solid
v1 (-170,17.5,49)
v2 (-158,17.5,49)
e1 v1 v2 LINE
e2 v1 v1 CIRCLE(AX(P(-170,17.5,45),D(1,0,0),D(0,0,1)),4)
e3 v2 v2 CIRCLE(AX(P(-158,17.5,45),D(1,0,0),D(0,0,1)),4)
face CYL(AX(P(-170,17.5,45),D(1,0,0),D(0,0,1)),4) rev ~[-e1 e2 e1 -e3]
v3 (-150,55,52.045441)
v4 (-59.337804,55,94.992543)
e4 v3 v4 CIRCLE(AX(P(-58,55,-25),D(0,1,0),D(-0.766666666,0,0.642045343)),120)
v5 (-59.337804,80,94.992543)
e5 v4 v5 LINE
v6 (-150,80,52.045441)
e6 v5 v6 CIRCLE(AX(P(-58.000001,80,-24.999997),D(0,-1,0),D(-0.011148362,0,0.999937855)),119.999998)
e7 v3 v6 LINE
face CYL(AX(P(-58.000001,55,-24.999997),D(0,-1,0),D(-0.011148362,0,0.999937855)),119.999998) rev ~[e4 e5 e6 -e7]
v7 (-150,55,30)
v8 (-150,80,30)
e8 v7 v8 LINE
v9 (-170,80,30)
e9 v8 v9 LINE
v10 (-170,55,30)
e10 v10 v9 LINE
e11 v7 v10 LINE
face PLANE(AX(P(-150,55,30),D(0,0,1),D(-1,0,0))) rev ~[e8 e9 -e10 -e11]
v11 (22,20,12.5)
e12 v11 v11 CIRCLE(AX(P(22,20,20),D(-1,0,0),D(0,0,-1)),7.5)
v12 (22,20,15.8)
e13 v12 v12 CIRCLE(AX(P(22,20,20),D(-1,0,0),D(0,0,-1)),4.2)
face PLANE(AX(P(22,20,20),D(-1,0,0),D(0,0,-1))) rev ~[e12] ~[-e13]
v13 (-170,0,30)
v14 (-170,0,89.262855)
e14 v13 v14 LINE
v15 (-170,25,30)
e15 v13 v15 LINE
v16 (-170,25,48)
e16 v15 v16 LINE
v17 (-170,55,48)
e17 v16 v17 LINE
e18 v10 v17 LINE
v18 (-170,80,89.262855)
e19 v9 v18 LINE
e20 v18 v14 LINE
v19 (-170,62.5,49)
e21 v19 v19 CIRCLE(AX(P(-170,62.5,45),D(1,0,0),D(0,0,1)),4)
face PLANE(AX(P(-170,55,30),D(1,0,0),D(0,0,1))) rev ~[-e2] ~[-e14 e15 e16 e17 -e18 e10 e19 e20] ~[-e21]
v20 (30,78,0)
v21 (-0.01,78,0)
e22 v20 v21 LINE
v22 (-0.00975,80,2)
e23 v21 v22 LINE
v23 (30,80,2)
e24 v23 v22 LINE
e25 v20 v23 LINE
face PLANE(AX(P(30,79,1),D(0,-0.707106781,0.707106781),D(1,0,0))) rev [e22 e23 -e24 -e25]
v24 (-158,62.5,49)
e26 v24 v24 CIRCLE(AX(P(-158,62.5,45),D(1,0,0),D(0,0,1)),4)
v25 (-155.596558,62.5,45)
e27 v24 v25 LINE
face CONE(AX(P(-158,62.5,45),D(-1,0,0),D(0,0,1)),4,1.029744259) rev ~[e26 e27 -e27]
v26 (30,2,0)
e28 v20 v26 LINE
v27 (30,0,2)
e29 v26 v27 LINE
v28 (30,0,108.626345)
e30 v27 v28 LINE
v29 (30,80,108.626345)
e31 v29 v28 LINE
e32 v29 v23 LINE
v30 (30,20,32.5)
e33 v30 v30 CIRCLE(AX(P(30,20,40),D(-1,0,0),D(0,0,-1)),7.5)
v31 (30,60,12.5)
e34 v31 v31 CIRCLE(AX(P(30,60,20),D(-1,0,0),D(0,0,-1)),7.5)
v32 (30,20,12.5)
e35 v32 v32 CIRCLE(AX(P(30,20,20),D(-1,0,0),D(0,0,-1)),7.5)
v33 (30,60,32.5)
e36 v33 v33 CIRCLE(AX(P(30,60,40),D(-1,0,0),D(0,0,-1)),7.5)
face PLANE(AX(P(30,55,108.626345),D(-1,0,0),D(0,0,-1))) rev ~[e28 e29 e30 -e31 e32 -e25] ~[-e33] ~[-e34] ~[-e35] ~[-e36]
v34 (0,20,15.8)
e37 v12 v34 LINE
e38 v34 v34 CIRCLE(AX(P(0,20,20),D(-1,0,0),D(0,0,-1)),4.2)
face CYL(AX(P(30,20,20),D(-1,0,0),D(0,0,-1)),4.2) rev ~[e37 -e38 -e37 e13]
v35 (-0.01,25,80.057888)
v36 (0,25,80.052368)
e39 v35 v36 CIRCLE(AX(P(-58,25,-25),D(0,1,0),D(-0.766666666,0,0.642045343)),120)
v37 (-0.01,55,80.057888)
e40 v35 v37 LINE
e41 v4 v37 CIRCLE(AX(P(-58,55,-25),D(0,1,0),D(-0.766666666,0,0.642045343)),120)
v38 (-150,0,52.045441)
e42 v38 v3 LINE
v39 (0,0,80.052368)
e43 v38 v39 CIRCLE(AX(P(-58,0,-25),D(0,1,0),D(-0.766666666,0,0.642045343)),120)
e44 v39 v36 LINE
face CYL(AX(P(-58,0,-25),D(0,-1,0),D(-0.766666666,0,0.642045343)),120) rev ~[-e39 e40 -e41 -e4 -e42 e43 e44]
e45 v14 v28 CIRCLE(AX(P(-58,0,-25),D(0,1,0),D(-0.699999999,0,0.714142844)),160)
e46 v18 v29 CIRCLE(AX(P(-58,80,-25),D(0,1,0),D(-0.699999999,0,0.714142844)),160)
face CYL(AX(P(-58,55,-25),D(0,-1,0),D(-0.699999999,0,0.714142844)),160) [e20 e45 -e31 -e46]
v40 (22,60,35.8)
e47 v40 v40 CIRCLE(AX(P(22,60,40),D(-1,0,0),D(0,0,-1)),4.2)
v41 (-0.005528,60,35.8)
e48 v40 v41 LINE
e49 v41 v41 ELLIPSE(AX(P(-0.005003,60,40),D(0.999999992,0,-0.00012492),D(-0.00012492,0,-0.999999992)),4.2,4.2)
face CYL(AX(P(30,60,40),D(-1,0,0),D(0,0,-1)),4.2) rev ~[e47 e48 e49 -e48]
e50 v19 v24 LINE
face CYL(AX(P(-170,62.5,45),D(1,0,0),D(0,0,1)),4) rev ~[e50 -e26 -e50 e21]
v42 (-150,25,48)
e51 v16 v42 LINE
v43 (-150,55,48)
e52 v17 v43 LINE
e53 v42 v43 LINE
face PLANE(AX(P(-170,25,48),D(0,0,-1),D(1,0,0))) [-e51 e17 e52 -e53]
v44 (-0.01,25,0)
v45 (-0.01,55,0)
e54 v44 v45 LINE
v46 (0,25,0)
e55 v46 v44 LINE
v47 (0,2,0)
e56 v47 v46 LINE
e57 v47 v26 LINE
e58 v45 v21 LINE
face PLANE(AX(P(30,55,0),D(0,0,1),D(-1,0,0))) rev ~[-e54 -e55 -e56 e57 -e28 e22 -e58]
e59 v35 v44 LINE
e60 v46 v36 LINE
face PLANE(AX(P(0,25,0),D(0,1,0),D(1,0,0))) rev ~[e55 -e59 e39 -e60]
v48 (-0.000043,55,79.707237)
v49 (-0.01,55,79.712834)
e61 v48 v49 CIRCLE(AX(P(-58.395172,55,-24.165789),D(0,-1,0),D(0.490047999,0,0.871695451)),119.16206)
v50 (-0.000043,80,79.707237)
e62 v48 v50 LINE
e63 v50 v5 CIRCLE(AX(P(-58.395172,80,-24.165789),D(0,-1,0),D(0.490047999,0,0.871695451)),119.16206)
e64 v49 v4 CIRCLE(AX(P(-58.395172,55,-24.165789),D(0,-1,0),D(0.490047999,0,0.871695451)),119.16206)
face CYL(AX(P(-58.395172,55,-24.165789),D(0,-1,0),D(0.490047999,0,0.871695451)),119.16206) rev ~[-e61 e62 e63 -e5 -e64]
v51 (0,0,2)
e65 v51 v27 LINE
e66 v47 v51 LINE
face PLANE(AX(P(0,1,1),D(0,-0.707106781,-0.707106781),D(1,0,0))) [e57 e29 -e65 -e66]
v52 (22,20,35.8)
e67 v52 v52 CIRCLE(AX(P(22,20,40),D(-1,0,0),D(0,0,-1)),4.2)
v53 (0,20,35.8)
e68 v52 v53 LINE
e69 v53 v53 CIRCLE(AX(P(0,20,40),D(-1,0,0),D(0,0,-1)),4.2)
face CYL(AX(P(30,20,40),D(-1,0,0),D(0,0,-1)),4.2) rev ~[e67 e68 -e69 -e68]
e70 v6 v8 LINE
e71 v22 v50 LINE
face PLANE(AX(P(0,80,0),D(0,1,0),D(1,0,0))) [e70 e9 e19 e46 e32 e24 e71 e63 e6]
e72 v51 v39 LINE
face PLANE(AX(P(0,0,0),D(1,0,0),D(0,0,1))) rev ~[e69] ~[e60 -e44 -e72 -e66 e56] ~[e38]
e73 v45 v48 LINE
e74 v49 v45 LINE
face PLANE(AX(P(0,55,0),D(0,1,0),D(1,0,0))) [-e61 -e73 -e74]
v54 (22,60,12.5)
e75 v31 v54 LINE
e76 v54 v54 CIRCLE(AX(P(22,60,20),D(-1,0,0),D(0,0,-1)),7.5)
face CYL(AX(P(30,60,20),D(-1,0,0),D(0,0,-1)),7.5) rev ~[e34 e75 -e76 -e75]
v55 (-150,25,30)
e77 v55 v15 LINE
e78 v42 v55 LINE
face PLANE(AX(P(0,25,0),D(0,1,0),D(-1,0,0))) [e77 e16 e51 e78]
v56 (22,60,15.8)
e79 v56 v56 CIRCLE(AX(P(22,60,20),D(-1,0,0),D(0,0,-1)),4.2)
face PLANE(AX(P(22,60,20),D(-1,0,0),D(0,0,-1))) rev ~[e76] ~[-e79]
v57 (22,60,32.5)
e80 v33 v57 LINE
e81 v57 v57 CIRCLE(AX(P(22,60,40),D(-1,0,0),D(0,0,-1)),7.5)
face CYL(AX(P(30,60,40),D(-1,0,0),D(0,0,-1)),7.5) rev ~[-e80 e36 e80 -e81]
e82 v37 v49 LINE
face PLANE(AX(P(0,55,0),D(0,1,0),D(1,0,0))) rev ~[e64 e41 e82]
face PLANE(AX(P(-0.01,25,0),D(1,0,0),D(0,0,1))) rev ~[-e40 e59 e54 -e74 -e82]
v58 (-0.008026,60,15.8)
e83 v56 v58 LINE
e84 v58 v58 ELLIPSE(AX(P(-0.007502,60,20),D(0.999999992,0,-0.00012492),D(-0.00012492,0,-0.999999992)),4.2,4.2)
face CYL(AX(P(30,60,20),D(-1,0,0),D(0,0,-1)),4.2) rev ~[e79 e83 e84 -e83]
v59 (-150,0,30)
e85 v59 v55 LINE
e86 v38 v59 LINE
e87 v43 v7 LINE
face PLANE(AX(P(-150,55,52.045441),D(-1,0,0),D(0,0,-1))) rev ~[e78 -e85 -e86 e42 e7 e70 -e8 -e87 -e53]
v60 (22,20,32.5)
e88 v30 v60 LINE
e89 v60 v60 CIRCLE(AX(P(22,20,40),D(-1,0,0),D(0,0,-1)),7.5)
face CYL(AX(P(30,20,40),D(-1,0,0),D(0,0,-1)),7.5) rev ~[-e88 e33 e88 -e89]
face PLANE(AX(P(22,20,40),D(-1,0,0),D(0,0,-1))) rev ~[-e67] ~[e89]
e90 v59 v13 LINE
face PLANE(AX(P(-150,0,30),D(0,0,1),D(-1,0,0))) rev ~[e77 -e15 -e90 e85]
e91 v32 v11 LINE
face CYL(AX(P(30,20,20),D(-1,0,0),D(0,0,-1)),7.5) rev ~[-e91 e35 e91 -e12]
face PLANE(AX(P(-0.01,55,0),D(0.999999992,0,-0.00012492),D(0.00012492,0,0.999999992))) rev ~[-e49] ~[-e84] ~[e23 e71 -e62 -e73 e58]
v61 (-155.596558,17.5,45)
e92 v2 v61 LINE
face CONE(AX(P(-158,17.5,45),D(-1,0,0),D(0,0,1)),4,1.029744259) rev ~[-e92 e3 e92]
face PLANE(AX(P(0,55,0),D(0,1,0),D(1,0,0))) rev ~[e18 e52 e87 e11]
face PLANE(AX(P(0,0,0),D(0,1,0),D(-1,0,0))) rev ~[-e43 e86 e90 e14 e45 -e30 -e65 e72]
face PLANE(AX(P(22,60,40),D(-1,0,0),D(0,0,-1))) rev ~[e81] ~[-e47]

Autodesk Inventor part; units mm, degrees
sketch "Sketch1" plane through (0, 0, 0) normal (0, 1, 0) x (-1, 0, 0)
  line L0 (0, 0) -> (-30, 0)
  arc A0 (170, 89.262855) -> (-30, 108.626345) centre (58, -25) ccw
  line L1 (-30, 0) -> (-30, 108.626345)
  line L2 (0, 0) -> (0, 80.052368)
  arc A1 (150, 52.045441) -> (0, 80.052368) centre (58, -25) ccw
  line L3 (170, 30) -> (170, 89.262855)
  line L4 (170, 0) -> (150, 0)
  line L5 (150, 52.045441) -> (150, 30)
  line L6 (150, 30) -> (170, 30)
  point P0 (-8.450723, -25)
  point P1 (160, 30)
  point P2 (160, 0)
  dimension "d0" = 30
  dimension "d1" = 25
  dimension "d3" = 320
  dimension "d137" = 30
ref_plane "Work Plane1" through (0, 0, 0) normal (-1, 0, 0) x (0, 0, 1)
ref_plane "Work Plane5" through (0, 26.089513, 40) normal (-1, 0, 0) x (0, 0, 1)
ref_plane "Work Plane4" through (0, 60, 20) normal (-1, 0, 0) x (0, 0, 1)
ref_plane "Work Plane2" through (-170, 0, 89.262855) normal (-1, 0, 0) x (0, 0, 1)
sketch "Sketch7" plane through (-170, 0, 89.262855) normal (-1, 0, 0) x (0, 0, 1)
  point P0 (-89.262855, 0)
ref_plane "Work Plane3" through (-170, 0, 0) normal (-1, 0, 0) x (0, 0, 1)
extrude "Extrusion4" add sketch "Sketch1" along normal blind 25
sketch "Sketch9" plane through (0, 25, 0) normal (0, 1, 0) x (1, 0, 0)
  line L0 (-170, 0) -> (-170, -89.262855)
  line L1 (-170, -48) -> (-150, -48)
  line L2 (-150, 0) -> (-170, 0)
  line L3 (-150, -48) -> (-150, -52.484587)
  line L4 (-170, -48) -> (-170, -89.262855)
  arc A0 (-150, -52.045441) -> (0, -80.052368) centre (-58, 25) ccw
  arc A1 (-150, -52.045441) -> (0, -80.052368) centre (-58, 25) ccw
  arc A2 (-170, -89.262855) -> (30, -108.626345) centre (-58, 25) ccw
  arc A3 (-170, -89.262855) -> (30, -108.626345) centre (-58, 25) ccw
  line L5 (-0.01, 0) -> (-0.01, -80.052368)
  line L6 (-0.01, -80.057888) -> (-0.01, 0)
  line L7 (30, 0) -> (-0.01, 0)
  line L8 (-0.01, 0) -> (30, 0)
  line L9 (30, -108.626345) -> (30, 0)
  line L10 (30, 0) -> (30, -108.626345)
  point P0 (0, 0)
  dimension "d79" = 20
  dimension "d80" = 48
extrude "Extrusion5" add sketch "Sketch9" along normal blind 30
sketch "Sketch10" plane through (0, 55, 0) normal (0, 1, 0) x (1, 0, 0)
  arc A0 (-150, -52.045441) -> (0, -79.707213) centre (-58.395171, 24.165786) ccw
  arc A1 (-170, -89.262855) -> (30, -108.626345) centre (-58, 25) ccw
  arc A2 (-170, -89.262855) -> (30, -108.626345) centre (-58, 25) ccw
  arc A3 (-150, -52.045441) -> (0, -80.052368) centre (-58, 25) ccw
  line L0 (-0.01, 0) -> (-0.01, -80.052368)
  line L1 (0, -80.052368) -> (-0.01, 0)
  line L2 (30, 0) -> (-0.01, 0)
  line L3 (-0.01, 0) -> (30, 0)
  line L4 (30, -108.626345) -> (30, 0)
  line L5 (30, 0) -> (30, -108.626345)
  line L6 (-170, 0) -> (-150, 0)
  line L7 (-170, -30) -> (-170, -89.262855)
  line L8 (-170, -89.262855) -> (-170, -30)
  line L9 (-150, -30) -> (-170, -30)
  line L10 (-170, -30) -> (-150, -30)
  line L11 (-150, -30) -> (-150, -52.045441)
  line L12 (-150, -48) -> (-150, -30)
  point P0 (0, 0)
  point P1 (-59.337804, -94.992543)
  point P2 (-0.000043, -79.707237)
  point P3 (-0.01, -79.712834)
sketch "Sketch10 outline for Extrusion6" plane through (0, 55, 0) normal (0, 1, 0) x (1, 0, 0)
  arc A0 (-0.000043, -79.707237) -> (-59.337804, -94.992543) centre (-58.395171, 24.165786) cw
  line L0 (-0.01, 0) -> (-0.000043, -79.707237)
  line L1 (30, 0) -> (-0.01, 0)
  line L2 (30, -108.626345) -> (30, 0)
  arc A1 (-170, -89.262855) -> (30, -108.626345) centre (-58, 25) ccw
  line L3 (-170, -30) -> (-170, -89.262855)
  line L4 (-150, -30) -> (-170, -30)
  line L5 (-150, -52.045441) -> (-150, -30)
  arc A2 (-59.337804, -94.992543) -> (-150, -52.045441) centre (-58, 25) cw
extrude "Extrusion6" add sketch "Sketch10 outline for Extrusion6" along normal blind 25
sketch "Sketch11" plane through (-0.01, 25, 0) normal (-1, 0, 0) x (0, 0, 1)
  point P0 (0, -25)
sketch "Sketch14" plane through (-0.01, 25, 0) normal (-1, 0, 0) x (0, 0, 1)
  point P0 (0, -25)
chamfer "Chamfer7" distance 2 angle 45 1 edges at (14.995, 80, 0) measured on face at (20, 80, 62.7779)
chamfer "Chamfer8" distance 2 angle 45 1 edges at (15, 0, 0) measured on face at (20, 0, 62.8929)
sketch "Sketch16" plane through (30, 0, 108.626345) normal (1, 0, 0) x (0, 0, -1)
  circle A0 centre (68.626345, 60) radius 7.5
  circle A1 centre (88.626345, 60) radius 7.5
  circle A2 centre (88.626345, 20) radius 7.5
  circle A3 centre (68.626345, 20) radius 7.5
  line L0 (108.626345, 2) -> (108.626345, 78)
  line L1 (0, 80) -> (106.626345, 80)
  line L2 (0, 0) -> (106.626345, 0)
  point P0 (108.626345, 0)
  dimension "d138" = 15
  dimension "d139" = 15
  dimension "d140" = 15
  dimension "d141" = 15
  dimension "d142" = 20
  dimension "d143" = 20
  dimension "d144" = 20
  dimension "d145" = 20
  dimension "d146" = 20
  dimension "d147" = 20
  dimension "d148" = 20
  dimension "d149" = 20
hole "Hole7" at (30, 20, 40) at (30, 60, 40) at (30, 60, 20) at (30, 20, 20) direction (-1, 0, 0) diameter 15 depth 8
sketch "Sketch17" plane through (30, 0, 108.626345) normal (1, 0, 0) x (0, 0, -1)
  circle A0 centre (68.626345, 60) radius 4.2
  circle A1 centre (68.626345, 20) radius 4.2
  circle A2 centre (88.626345, 20) radius 7.5
  circle A3 centre (88.626345, 20) radius 4.2
  circle A4 centre (88.626345, 60) radius 7.5
  circle A5 centre (88.626345, 60) radius 4.2
  line L0 (108.626345, 2) -> (108.626345, 78)
  line L1 (0, 80) -> (106.626345, 80)
  line L2 (0, 0) -> (106.626345, 0)
  point P0 (108.626345, 0)
  dimension "d157" = 8.4
  dimension "d158" = 8.4
  dimension "d159" = 8.4
  dimension "d160" = 8.4
  dimension "d161" = 40
  dimension "d162" = 20
  dimension "d163" = 40
  dimension "d164" = 20
hole "Hole8" at (30, 60, 40) at (30, 20, 40) at (30, 20, 20) at (30, 60, 20) direction (-1, 0, 0) diameter 8.4 depth 50
sketch "Sketch18" plane through (-170, 0, 30) normal (-1, 0, 0) x (0, 0, 1)
  circle A0 centre (15, 17.5) radius 4
  circle A1 centre (15, 62.5) radius 4
  line L0 (0, 0) -> (0, 25)
  line L1 (0, 55) -> (0, 80)
  line L2 (0, 0) -> (59.262855, 0)
  line L3 (0, 80) -> (59.262855, 80)
  point P0 (-30, 0)
  dimension "d172" = 8
  dimension "d173" = 8
  dimension "d174" = 15
  dimension "d175" = 15
  dimension "d176" = 17.5
  dimension "d177" = 17.5
  dimension "d178" = 45
hole "Hole9" at (-170, 17.5, 45) at (-170, 62.5, 45) direction (1, 0, 0) diameter 8 depth 12 tip angle 118
properties part number "Gestell" material "Steel, Mild"
